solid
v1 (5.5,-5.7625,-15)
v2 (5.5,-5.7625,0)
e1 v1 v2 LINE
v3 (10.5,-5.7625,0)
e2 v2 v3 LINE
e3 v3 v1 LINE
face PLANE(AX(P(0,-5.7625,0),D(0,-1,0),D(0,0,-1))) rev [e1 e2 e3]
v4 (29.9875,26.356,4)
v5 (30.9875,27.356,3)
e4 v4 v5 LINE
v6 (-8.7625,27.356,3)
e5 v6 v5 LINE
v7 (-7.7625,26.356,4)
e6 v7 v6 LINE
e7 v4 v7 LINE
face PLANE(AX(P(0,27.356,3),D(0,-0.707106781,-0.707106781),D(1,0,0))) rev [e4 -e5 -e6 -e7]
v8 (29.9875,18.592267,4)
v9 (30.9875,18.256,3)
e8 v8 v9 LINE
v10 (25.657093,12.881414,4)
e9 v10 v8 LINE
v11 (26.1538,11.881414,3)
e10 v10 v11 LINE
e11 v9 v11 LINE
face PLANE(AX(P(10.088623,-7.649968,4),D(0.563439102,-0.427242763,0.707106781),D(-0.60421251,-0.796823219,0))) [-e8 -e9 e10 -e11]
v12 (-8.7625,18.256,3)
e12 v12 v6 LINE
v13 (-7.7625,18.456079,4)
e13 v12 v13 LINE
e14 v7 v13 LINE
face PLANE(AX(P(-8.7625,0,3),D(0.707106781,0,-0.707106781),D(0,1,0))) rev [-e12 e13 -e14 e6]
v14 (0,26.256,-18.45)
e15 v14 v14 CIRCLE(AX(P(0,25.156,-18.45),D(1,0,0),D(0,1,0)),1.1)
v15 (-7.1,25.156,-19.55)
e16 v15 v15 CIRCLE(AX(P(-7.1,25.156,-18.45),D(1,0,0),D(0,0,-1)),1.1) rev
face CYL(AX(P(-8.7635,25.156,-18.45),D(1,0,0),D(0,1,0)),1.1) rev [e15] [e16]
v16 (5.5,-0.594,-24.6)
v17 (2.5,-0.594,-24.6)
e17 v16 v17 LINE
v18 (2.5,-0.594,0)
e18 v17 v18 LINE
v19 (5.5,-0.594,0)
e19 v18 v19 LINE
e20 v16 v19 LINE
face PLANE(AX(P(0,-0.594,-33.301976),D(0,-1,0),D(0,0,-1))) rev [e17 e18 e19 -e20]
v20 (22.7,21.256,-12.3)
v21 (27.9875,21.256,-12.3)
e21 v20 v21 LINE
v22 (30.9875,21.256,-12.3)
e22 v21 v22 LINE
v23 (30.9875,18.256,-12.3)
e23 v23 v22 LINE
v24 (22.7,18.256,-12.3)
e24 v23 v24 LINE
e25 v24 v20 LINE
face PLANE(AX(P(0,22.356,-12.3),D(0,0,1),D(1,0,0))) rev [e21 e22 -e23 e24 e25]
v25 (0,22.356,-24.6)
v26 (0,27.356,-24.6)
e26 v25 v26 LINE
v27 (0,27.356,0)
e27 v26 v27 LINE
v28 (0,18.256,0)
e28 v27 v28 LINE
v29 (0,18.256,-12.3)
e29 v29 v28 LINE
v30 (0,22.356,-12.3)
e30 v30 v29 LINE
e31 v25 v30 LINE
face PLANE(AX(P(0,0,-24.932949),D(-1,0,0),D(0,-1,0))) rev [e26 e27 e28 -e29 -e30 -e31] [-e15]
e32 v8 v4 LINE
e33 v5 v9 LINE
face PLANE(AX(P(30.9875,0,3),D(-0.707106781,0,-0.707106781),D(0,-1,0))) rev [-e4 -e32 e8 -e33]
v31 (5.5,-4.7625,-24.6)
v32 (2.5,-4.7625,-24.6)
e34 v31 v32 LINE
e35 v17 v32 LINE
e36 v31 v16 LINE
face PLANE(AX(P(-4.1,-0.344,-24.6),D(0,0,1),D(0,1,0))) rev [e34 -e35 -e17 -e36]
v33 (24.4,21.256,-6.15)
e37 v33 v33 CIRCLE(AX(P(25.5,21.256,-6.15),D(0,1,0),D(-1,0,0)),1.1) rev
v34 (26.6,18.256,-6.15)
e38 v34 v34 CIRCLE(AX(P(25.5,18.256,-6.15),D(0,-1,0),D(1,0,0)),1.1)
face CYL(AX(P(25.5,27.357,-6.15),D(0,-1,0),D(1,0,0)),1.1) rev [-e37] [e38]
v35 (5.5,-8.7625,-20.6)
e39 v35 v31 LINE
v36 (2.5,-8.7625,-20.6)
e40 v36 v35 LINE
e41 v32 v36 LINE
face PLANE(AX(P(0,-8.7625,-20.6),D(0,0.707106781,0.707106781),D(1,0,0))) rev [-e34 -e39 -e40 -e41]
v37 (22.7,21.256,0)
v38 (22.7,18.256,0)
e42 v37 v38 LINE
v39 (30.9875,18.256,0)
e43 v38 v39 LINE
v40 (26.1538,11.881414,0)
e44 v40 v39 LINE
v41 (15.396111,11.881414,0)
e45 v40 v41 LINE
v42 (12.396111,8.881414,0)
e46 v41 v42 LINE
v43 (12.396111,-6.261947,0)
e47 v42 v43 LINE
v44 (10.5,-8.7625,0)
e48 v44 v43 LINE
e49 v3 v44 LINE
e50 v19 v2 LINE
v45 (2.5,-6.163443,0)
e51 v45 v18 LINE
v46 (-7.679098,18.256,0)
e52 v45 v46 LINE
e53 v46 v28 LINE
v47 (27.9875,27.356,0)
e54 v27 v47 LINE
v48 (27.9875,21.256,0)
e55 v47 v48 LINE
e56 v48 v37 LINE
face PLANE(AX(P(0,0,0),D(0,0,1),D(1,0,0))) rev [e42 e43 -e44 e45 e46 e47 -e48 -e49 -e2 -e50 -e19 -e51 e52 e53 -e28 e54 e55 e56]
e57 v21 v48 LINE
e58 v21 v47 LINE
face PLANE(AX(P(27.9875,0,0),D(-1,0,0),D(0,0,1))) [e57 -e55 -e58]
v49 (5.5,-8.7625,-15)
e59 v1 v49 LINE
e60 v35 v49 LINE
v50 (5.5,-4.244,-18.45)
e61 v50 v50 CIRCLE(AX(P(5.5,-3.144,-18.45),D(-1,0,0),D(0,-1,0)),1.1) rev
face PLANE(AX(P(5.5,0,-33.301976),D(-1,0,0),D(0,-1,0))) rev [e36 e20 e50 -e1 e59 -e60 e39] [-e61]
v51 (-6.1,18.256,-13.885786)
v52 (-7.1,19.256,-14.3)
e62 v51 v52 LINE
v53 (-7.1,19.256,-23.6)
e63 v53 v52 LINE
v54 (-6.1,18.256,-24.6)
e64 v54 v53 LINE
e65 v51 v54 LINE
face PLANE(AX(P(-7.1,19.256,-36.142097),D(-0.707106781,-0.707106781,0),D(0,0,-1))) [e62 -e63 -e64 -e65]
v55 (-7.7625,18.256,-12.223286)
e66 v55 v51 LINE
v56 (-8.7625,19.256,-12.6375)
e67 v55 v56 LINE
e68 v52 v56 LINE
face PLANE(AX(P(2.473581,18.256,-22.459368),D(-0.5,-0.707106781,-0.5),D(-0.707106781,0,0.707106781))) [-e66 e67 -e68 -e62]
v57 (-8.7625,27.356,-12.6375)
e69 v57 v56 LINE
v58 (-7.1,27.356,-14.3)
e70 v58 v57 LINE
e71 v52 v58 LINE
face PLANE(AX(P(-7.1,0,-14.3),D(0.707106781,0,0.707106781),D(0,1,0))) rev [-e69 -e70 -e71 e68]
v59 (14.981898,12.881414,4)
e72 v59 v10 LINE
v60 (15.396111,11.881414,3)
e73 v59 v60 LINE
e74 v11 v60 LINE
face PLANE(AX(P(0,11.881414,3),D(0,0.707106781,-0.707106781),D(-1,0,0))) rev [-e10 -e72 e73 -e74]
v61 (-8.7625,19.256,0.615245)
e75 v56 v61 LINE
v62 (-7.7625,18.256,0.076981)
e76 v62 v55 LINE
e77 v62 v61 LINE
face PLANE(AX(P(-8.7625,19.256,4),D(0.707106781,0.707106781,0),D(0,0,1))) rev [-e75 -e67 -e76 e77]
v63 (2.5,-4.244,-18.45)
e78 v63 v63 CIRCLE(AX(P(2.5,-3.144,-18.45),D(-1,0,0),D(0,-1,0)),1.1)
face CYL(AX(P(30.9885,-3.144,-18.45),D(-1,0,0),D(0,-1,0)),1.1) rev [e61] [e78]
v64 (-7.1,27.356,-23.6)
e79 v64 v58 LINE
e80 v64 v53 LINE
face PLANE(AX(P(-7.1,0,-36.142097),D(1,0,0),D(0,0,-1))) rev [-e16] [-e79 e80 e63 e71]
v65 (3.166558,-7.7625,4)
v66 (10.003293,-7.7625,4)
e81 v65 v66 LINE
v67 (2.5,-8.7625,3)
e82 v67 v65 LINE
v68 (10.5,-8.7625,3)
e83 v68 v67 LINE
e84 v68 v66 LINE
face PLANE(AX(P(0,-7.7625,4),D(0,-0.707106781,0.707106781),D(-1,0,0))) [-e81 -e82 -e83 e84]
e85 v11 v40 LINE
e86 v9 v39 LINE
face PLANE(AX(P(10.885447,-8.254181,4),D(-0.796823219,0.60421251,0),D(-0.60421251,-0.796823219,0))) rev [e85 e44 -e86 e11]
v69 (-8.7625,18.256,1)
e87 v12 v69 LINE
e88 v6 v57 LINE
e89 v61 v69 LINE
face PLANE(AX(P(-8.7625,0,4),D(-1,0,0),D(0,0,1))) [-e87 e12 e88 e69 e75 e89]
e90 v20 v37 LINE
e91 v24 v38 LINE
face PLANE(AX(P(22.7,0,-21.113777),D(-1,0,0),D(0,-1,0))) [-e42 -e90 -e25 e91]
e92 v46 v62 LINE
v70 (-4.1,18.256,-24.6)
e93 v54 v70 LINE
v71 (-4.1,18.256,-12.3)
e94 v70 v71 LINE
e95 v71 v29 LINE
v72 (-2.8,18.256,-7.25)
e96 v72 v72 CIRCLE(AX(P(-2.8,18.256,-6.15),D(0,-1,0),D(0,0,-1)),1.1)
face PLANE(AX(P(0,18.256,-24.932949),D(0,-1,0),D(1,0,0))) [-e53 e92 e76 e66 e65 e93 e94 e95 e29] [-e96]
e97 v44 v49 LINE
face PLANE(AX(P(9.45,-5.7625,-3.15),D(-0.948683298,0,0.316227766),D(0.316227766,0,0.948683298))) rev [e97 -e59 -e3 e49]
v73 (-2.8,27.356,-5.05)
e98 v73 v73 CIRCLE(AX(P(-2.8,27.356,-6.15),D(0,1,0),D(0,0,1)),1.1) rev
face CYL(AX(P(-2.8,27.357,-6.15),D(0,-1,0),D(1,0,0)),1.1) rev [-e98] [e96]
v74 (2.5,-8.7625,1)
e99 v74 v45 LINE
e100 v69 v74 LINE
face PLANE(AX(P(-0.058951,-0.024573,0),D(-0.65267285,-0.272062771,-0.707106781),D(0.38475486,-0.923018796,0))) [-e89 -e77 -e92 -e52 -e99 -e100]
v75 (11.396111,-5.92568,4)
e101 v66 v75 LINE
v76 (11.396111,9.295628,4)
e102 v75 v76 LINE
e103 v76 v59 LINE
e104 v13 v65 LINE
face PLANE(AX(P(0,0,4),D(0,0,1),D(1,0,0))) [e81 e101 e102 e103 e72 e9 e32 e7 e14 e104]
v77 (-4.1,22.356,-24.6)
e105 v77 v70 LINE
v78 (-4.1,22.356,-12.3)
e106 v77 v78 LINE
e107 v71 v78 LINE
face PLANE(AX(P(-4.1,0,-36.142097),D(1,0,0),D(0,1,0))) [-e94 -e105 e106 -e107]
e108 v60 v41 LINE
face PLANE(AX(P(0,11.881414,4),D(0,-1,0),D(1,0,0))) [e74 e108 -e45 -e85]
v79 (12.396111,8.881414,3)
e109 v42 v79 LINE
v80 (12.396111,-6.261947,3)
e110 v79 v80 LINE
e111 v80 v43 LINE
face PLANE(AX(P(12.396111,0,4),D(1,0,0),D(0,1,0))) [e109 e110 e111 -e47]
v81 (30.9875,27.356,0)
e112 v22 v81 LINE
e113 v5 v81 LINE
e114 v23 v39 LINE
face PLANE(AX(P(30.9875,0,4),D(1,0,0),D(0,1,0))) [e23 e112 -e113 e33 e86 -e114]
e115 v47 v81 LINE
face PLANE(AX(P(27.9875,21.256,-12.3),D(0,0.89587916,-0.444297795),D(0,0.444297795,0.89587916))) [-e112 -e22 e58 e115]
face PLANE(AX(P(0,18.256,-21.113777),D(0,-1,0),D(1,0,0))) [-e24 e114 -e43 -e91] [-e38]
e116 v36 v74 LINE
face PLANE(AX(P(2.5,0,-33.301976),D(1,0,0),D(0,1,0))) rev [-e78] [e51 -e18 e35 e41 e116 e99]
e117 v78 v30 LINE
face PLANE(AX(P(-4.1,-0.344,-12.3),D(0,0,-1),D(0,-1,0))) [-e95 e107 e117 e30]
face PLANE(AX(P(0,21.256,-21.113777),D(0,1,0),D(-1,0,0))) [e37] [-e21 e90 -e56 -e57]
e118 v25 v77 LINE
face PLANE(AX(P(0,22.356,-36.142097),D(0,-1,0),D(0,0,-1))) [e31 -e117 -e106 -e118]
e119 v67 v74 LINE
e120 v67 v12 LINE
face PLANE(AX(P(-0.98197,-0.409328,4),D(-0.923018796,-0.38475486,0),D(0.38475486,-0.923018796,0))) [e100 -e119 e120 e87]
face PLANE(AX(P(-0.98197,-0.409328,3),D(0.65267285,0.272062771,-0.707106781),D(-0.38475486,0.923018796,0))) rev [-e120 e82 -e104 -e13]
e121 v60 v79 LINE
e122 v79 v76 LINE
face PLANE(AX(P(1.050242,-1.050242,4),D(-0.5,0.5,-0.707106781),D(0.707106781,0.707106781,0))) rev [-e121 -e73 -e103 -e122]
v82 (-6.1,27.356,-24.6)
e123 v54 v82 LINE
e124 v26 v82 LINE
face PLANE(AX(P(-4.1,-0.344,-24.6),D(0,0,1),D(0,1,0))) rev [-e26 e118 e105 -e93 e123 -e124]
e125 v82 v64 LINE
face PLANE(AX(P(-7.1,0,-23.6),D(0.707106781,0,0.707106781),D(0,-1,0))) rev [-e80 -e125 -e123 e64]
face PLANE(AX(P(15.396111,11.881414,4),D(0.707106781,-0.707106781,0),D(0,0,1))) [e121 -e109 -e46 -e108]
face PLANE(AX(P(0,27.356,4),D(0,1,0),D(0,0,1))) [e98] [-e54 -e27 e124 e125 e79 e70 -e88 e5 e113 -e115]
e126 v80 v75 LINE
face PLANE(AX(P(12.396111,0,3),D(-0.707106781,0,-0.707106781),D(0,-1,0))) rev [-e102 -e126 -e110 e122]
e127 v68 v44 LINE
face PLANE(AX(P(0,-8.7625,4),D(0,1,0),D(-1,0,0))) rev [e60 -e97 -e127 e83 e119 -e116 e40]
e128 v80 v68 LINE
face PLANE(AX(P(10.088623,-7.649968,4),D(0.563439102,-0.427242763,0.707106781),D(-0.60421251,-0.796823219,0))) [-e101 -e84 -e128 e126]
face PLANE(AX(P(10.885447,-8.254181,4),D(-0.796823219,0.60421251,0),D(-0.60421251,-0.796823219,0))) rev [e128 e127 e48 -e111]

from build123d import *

# Parameters (mm, degrees)
BOSS_EXTRUDE1_DEPTH = 4
BOSS_EXTRUDE2_DEPTH = 24.6
BOSS_EXTRUDE3_DEPTH = 12.3
BOSS_EXTRUDE4_DEPTH = 12.3
BOSS_EXTRUDE5_DEPTH = 12.3
BOSS_EXTRUDE6_DEPTH = 3
CHAMFER1_SIZE       = 4
CHAMFER4_SIZE       = 2
CHAMFER5_SIZE       = 1
BOSS_EXTRUDE7_DEPTH = 3
CHAMFER8_SIZE       = 3
CHAMFER7_SIZE       = 1
CUT_EXTRUDE1_REACH  = 48.53
CUT_EXTRUDE2_REACH  = 50.101
CUT_EXTRUDE3_REACH  = 49.91
CUT_EXTRUDE4_REACH  = 49.91


with BuildPart() as part:
    # Sketch1 → Boss-Extrude1 (new body)
    with BuildSketch(Plane.XY):
        Polygon((-8.7625, 27.356), (-8.7625, 18.256), (0.832623943, -4.7625), (2.5, -8.7625), (10.5, -8.7625), (12.39611144, -6.261946641), (12.39611144, 11.881414246), (26.153799919, 11.881414246), (30.9875, 18.256), (30.9875, 27.356), align=None)
    extrude(amount=BOSS_EXTRUDE1_DEPTH)

    # Sketch1<5> → Boss-Extrude2 (add)
    with BuildSketch(Plane.XY):
        Polygon((2.5, -5.094), (2.5, -8.7625), (5.5, -8.7625), (5.5, -0.594), (2.5, -0.594), align=None)
    extrude(amount=-BOSS_EXTRUDE2_DEPTH)

    # Sketch2 → Boss-Extrude3 (add)
    with BuildSketch(Plane(origin=(0, 0, 0), x_dir=(-1, 0, 0), z_dir=(0, 0, -1))):
        Polygon((-27.45, 18.256), (-22.7, 18.256), (-22.7, 21.256), (-30.9875, 21.256), (-30.9875, 18.256), align=None)
    extrude(amount=BOSS_EXTRUDE3_DEPTH)

    # Sketch3 → Boss-Extrude4 (add)
    with BuildSketch(Plane(origin=(0, 0, 0), x_dir=(-1, 0, 0), z_dir=(0, 0, -1))):
        Polygon((0, 18.256), (4.75, 18.256), (8.7625, 18.256), (8.7625, 27.356), (0, 27.356), (0, 22.106), align=None)
    extrude(amount=BOSS_EXTRUDE4_DEPTH)

    # Sketch4 → Boss-Extrude5 (add)
    with BuildSketch(Plane(origin=(0, 0, -12.3), x_dir=(-1, 0, 0), z_dir=(0, 0, -1))):
        Polygon((4.1, 22.106), (4.1, 18.256), (7.1, 18.256), (7.1, 27.356), (0, 27.356), (0, 22.356), (3.85, 22.356), (4.1, 22.356), align=None)
    extrude(amount=BOSS_EXTRUDE5_DEPTH)

    # Sketch5 → Boss-Extrude6 (add)
    with BuildSketch(Plane.XZ.offset(8.7625)):
        Polygon((5.5, -15), (10.5, 0), (5.5, 0), align=None)
    extrude(amount=-BOSS_EXTRUDE6_DEPTH)

    # Chamfer1
    chamfer1_edges = [part.edges().sort_by_distance(p)[0] for p in [
        (4, -8.7625, -24.6),
    ]]
    chamfer(chamfer1_edges, length=CHAMFER1_SIZE)

    # Chamfer4
    # the kernel refuses this chamfer: 2 mm, written as the material it adds along each edge
    with BuildSketch(Plane(origin=(-7.1, 18.256, -12.3), x_dir=(-0.9996219169112973, 0, 0.027495876610566645), z_dir=(0, 1, 0))) as chamfer4_piece_1_section:
        Polygon((CHAMFER4_SIZE * 0.999621916911, -CHAMFER4_SIZE * 0.0274958766106), (-CHAMFER4_SIZE * 0.0274958766106, -CHAMFER4_SIZE * 0.999621916911), (0, 0), align=None)
    chamfer4_piece_1 = extrude(amount=9.1, mode=Mode.PRIVATE)
    chamfer4_piece_1 = split(chamfer4_piece_1, bisect_by=Plane(origin=(-8.7625, 22.806, -12.984491238), z_dir=(1, 0, 0)), keep=Keep.TOP, mode=Mode.PRIVATE)
    add(chamfer4_piece_1)

    # Chamfer5
    chamfer5_edges = [part.edges().sort_by_distance(p)[0] for p in [
        (-7.93125, 18.256, -13.46875),
        (-8.7625, 18.256, -6.31875),
        (-7.1, 22.806, -24.6),
        (-7.1, 18.256, -19.45),
    ]]
    chamfer(chamfer5_edges, length=CHAMFER5_SIZE)

    # Sketch6 → Boss-Extrude7 (add)
    with BuildSketch(Plane(origin=(30.9875, 0, 0), x_dir=(0, 0, -1), z_dir=(1, 0, 0))):
        Polygon((12.3, 21.256), (0, 27.356), (-0.5, 27.356), (-0.5, 20.756), (12.3, 20.756), align=None)
    extrude(amount=-BOSS_EXTRUDE7_DEPTH)

    # Chamfer8
    chamfer8_edges = [part.edges().sort_by_distance(p)[0] for p in [
        (12.39611144, 11.881414246, 2),
    ]]
    chamfer(chamfer8_edges, length=CHAMFER8_SIZE)

    # Chamfer7
    chamfer7_edges = [part.edges().sort_by_distance(p)[0] for p in [
        (11.44805572, -7.51222332, 4),
        (-3.13125, 4.74675, 0),
        (12.39611144, 1.309733803, 4),
        (13.89611144, 10.381414246, 4),
        (20.77495568, 11.881414246, 4),
        (28.57064996, 15.068707123, 4),
        (30.9875, 22.806, 4),
        (11.1125, 27.356, 4),
        (-8.7625, 22.806, 4),
        (-3.13125, 4.74675, 4),
        (6.5, -8.7625, 4),
    ]]
    chamfer(chamfer7_edges, length=CHAMFER7_SIZE)

    # Sketch7 → Cut-Extrude1 (cut, up to next)
    with BuildSketch(Plane.ZY.offset(-2.5), mode=Mode.PRIVATE) as cut_extrude1_sk1:
        with BuildLine():
            ThreePointArc((-18.7, -4.215214264), (-18.45, -4.244), (-18.2, -4.215214264))
            ThreePointArc((-18.2, -4.215214264), (-17.588315603, -3.827739717), (-17.35, -3.144))
            ThreePointArc((-17.35, -3.144), (-19.133739717, -2.282315603), (-18.7, -4.215214264))
        make_face()
    cut_extrude1_tool1 = extrude(cut_extrude1_sk1.sketch, amount=-CUT_EXTRUDE1_REACH, mode=Mode.PRIVATE) & part.part
    add(cut_extrude1_tool1.solids().sort_by_distance((2.5, -3.144, -18.45))[0], mode=Mode.SUBTRACT)

    # Sketch8 → Cut-Extrude2 (cut, up to next)
    with BuildSketch(Plane(origin=(0, 0, 0), x_dir=(0, 0, -1), z_dir=(1, 0, 0)), mode=Mode.PRIVATE) as cut_extrude2_sk1:
        with BuildLine():
            ThreePointArc((18.7, 26.227214264), (18.45, 26.256), (18.2, 26.227214264))
            ThreePointArc((18.2, 26.227214264), (17.766260283, 24.294315603), (19.55, 25.156))
            ThreePointArc((19.55, 25.156), (19.311684397, 25.839739717), (18.7, 26.227214264))
        make_face()
    cut_extrude2_tool1 = extrude(cut_extrude2_sk1.sketch, amount=-CUT_EXTRUDE2_REACH, mode=Mode.PRIVATE) & part.part
    add(cut_extrude2_tool1.solids().sort_by_distance((0, 25.156, -18.45))[0], mode=Mode.SUBTRACT)

    # Sketch9 → Cut-Extrude3 (cut, up to next)
    with BuildSketch(Plane.XZ.offset(-18.256), mode=Mode.PRIVATE) as cut_extrude3_sk1:
        with BuildLine():
            ThreePointArc((-3.871214264, -5.9), (-3.9, -6.15), (-3.871214264, -6.4))
            ThreePointArc((-3.871214264, -6.4), (-2.67417411, -7.24277987), (-1.7, -6.15))
            ThreePointArc((-1.7, -6.15), (-2.67417411, -5.05722013), (-3.871214264, -5.9))
        make_face()
    cut_extrude3_tool1 = extrude(cut_extrude3_sk1.sketch, amount=-CUT_EXTRUDE3_REACH, mode=Mode.PRIVATE) & part.part
    add(cut_extrude3_tool1.solids().sort_by_distance((-2.8, 18.256, -6.15))[0], mode=Mode.SUBTRACT)

    # Sketch10 → Cut-Extrude4 (cut, up to next)
    with BuildSketch(Plane.XZ.offset(-18.256), mode=Mode.PRIVATE) as cut_extrude4_sk1:
        with BuildLine():
            ThreePointArc((26.6, -6.15), (26.59277987, -6.02417411), (26.571214264, -5.9))
            ThreePointArc((26.571214264, -5.9), (24.4, -6.15), (26.571214264, -6.4))
            ThreePointArc((26.571214264, -6.4), (26.59277987, -6.27582589), (26.6, -6.15))
        make_face()
    cut_extrude4_tool1 = extrude(cut_extrude4_sk1.sketch, amount=-CUT_EXTRUDE4_REACH, mode=Mode.PRIVATE) & part.part
    add(cut_extrude4_tool1.solids().sort_by_distance((25.5, 18.256, -6.15))[0], mode=Mode.SUBTRACT)


solid = part.part
